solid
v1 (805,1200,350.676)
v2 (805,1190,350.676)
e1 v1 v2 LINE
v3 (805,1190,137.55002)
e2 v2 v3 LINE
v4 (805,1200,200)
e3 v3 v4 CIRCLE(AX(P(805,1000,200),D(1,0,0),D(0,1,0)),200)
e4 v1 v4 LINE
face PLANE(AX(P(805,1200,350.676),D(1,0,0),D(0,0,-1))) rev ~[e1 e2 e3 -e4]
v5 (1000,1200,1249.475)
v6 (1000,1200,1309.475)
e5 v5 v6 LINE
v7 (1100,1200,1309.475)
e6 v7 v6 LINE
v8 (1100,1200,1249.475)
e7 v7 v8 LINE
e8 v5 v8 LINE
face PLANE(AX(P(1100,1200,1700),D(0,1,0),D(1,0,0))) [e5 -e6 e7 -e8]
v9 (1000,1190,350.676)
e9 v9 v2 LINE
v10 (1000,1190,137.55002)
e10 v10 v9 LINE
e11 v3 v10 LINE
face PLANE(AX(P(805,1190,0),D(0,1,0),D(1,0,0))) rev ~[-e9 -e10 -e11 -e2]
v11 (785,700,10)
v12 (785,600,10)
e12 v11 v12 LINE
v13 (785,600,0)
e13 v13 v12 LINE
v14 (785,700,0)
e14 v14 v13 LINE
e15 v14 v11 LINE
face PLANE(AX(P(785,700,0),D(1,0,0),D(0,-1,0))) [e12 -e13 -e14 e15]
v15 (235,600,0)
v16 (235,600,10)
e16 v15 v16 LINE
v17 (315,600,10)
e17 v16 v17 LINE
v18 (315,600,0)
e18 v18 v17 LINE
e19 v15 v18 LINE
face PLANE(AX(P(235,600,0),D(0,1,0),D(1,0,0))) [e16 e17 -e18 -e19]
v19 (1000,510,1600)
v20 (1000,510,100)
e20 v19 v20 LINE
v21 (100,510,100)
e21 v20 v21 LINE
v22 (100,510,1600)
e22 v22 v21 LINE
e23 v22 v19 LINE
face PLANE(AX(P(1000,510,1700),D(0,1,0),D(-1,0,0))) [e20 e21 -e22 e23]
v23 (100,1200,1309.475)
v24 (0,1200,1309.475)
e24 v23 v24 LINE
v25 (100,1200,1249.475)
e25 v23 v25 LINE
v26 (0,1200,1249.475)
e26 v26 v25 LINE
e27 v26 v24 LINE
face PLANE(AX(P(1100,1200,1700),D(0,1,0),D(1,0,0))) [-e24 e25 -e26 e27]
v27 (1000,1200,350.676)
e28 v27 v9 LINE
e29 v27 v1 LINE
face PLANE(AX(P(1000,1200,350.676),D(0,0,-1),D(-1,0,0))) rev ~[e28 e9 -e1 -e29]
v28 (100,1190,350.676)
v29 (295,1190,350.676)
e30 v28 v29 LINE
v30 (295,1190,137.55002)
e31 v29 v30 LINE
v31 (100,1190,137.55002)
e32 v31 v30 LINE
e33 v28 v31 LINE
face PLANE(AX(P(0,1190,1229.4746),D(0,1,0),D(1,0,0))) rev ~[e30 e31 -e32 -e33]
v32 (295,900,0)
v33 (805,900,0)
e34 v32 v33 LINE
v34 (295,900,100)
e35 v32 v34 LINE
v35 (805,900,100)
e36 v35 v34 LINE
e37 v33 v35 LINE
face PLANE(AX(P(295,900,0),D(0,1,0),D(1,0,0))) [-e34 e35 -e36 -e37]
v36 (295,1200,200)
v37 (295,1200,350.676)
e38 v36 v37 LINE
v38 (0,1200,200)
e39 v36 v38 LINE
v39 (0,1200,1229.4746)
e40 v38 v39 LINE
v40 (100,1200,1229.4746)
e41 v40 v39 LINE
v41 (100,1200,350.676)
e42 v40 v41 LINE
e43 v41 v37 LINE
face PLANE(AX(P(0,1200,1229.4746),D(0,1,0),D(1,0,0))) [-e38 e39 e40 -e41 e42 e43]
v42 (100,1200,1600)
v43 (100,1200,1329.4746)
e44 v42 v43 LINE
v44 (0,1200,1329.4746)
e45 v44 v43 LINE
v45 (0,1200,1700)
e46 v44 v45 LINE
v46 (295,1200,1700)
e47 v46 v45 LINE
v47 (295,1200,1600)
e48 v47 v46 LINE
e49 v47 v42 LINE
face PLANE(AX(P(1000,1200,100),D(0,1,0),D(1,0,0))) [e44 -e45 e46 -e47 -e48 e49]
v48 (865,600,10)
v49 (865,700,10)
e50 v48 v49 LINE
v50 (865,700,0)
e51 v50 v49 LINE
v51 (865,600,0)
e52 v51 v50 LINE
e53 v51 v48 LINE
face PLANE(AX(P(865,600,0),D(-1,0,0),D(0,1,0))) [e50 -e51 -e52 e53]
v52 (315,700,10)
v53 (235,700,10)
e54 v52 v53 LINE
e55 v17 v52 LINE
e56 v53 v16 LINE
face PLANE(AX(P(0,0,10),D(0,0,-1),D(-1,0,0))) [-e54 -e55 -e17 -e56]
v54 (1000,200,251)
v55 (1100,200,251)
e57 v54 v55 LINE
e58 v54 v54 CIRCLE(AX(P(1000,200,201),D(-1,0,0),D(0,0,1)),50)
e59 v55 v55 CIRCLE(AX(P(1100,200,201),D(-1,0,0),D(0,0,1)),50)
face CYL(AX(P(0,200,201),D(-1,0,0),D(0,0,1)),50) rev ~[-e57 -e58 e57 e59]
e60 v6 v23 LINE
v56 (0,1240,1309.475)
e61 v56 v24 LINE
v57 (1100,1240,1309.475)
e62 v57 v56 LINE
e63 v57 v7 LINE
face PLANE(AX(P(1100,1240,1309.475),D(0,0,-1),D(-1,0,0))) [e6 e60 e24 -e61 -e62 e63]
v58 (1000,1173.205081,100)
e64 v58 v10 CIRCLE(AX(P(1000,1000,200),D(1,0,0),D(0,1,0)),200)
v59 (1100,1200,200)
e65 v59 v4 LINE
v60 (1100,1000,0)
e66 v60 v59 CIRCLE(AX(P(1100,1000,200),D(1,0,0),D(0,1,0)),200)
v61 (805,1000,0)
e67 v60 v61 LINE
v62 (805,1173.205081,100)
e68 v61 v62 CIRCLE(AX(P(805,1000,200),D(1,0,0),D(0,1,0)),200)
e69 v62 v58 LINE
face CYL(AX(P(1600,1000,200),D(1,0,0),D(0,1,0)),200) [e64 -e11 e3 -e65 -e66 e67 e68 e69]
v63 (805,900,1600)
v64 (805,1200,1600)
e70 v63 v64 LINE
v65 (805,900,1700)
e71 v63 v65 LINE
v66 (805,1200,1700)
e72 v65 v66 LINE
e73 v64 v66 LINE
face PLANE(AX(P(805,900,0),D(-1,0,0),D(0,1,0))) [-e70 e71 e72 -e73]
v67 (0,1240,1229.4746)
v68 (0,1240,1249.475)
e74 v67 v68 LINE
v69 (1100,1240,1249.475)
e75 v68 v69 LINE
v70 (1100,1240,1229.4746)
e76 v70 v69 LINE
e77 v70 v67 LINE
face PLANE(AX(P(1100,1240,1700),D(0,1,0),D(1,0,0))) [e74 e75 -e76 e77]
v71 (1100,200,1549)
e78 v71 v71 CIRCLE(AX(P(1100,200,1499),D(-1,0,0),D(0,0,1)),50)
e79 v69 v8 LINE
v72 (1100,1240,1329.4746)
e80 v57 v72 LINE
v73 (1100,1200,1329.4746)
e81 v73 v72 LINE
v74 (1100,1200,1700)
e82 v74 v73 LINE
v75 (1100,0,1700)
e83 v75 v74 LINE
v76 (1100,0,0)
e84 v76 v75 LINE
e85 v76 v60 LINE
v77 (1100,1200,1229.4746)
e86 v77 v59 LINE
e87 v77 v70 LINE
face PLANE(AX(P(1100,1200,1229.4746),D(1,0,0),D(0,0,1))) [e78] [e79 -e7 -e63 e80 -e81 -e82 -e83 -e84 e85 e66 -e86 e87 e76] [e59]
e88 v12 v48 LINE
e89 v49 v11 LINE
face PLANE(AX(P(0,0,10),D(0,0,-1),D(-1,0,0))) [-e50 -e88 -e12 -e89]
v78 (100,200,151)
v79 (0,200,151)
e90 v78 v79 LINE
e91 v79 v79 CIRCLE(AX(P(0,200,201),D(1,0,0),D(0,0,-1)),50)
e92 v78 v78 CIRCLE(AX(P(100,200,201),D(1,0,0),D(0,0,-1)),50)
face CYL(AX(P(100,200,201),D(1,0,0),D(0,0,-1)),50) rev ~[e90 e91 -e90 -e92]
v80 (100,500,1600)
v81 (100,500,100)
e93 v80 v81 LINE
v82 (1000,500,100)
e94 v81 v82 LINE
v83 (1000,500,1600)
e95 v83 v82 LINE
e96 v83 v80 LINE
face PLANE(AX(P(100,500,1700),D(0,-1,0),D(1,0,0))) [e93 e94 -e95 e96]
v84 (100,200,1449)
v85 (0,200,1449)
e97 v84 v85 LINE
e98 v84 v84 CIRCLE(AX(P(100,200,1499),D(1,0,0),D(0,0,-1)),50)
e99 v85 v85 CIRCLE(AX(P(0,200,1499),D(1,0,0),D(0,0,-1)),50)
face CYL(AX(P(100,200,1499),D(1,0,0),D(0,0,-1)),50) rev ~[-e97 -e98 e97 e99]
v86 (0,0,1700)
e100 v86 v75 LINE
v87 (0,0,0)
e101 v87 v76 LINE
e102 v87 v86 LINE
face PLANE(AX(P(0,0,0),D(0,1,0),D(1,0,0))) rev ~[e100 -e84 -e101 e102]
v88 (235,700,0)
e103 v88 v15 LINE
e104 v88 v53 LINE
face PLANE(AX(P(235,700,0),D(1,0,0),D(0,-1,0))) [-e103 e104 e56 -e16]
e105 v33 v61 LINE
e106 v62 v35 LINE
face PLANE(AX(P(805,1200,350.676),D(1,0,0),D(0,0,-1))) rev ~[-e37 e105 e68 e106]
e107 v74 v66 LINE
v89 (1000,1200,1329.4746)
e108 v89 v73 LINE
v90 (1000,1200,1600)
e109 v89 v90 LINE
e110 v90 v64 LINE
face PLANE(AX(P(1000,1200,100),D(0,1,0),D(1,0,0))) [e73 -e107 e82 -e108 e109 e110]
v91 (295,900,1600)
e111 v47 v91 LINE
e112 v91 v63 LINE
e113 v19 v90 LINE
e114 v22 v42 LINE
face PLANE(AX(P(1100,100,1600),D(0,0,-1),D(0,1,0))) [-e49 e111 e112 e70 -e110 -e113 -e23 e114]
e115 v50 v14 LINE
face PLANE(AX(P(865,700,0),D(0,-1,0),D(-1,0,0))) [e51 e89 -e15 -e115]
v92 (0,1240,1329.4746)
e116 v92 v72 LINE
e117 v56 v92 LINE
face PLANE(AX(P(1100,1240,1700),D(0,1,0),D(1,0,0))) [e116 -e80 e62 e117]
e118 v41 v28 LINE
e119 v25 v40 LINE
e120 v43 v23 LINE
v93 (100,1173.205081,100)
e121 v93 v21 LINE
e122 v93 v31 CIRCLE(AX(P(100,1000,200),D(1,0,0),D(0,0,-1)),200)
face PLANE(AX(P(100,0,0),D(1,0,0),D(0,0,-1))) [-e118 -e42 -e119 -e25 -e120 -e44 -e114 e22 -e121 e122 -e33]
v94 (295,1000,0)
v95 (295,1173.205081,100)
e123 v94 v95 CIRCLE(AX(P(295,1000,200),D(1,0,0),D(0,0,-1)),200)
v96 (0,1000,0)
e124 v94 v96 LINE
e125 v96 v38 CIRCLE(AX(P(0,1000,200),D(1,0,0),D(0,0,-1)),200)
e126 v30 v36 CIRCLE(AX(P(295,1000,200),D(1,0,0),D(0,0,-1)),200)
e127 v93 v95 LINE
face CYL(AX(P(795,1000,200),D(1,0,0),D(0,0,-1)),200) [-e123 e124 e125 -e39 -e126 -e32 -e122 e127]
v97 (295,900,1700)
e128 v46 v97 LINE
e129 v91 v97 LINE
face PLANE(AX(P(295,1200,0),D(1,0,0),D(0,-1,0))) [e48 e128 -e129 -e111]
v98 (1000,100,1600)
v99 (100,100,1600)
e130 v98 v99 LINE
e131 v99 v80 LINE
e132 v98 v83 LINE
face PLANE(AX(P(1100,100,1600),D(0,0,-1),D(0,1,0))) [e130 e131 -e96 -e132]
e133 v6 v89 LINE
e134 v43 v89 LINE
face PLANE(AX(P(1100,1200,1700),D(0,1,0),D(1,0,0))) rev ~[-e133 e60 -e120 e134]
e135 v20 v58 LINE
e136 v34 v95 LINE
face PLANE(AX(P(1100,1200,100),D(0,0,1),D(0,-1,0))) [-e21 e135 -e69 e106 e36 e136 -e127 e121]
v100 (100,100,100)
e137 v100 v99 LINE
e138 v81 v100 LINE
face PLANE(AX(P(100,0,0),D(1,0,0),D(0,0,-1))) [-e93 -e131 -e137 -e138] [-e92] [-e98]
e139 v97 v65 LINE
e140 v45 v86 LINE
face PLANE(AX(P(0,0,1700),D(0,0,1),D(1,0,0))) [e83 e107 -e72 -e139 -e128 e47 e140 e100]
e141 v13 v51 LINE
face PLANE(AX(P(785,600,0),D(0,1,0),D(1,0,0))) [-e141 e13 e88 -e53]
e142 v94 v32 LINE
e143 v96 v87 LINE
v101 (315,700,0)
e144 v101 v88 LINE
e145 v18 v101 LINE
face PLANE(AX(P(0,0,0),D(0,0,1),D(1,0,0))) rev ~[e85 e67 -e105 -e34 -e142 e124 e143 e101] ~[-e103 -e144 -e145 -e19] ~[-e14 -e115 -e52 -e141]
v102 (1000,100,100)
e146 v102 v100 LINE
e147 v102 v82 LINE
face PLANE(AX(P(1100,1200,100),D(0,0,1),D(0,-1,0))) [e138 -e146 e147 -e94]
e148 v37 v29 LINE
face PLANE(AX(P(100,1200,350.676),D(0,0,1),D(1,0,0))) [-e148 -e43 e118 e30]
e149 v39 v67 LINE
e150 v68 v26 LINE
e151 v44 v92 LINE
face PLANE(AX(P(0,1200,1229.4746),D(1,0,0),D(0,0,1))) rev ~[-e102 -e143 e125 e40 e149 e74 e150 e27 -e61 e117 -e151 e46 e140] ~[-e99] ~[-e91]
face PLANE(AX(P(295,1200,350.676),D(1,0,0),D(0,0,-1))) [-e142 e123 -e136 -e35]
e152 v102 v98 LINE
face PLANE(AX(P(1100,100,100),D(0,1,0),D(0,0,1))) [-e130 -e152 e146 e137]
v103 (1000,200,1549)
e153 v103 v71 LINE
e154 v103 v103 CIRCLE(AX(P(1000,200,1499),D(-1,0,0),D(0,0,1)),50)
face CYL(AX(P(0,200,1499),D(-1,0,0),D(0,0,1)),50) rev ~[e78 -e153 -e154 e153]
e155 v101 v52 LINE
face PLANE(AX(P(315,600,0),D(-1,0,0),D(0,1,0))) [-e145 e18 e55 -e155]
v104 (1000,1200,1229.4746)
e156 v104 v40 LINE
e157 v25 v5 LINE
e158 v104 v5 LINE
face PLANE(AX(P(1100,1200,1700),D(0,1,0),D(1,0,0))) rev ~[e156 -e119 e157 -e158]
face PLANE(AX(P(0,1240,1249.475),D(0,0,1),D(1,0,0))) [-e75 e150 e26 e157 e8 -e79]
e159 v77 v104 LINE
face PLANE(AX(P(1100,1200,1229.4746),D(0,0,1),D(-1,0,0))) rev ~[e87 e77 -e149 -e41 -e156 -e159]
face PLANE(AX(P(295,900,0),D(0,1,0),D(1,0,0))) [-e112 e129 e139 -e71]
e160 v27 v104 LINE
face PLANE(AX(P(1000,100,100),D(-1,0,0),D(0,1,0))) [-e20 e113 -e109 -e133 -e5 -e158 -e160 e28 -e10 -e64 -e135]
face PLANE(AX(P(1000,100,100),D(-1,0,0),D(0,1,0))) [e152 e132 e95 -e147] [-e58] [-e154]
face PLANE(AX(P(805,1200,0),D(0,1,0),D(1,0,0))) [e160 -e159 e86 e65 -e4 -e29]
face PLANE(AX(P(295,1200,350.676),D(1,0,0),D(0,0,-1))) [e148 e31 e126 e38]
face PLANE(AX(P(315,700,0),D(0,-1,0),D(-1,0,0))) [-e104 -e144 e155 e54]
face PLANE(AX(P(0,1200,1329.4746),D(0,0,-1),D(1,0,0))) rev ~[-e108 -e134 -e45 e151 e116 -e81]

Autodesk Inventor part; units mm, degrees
ref_plane "YZ Plane" through (0, 0, 0) normal (1, 0, 0) x (0, 1, 0)
ref_plane "XZ Plane" through (0, 0, 0) normal (0, 1, 0) x (-1, 0, 0)
ref_plane "XY Plane" through (0, 0, 0) normal (0, 0, 1) x (1, 0, 0)
sketch "Sketch10" plane through (0, 0, 0) normal (0, 1, 0) x (-1, 0, 0)
  point P0 (0, 0)
sketch "Sketch11" plane through (0, 0, 0) normal (0, 0, 1) x (1, 0, 0)
  point P0 (0, 0)
sketch "Sketch12" plane through (0, 0, 0) normal (0, 0, 1) x (1, 0, 0)
  line L0 (0, 0) -> (1100, 0)
  line L1 (1100, 0) -> (1100, 1200)
  line L2 (1100, 1200) -> (0, 1200)
  line L3 (0, 1200) -> (0, 0)
  dimension "d20" = 1100
  dimension "d21" = 1200
extrude "Extrusion6" add sketch "Sketch12" along normal blind 1700
sketch "Sketch13" plane through (1100, 0, 0) normal (1, 0, 0) x (0, 0, -1)
  line L0 (-100, 100) -> (-1600, 100)
  line L1 (-1600, 100) -> (-1600, 1200)
  line L2 (-1600, 1200) -> (-100, 1200)
  line L3 (-100, 1200) -> (-100, 100)
  point P0 (0, 0)
  dimension "d24" = 1500
extrude "Extrusion7" cut sketch "Sketch13" against normal blind 1000
sketch "Sketch16" plane through (100, 0, 0) normal (1, 0, 0) x (0, 0, -1)
  circle A0 centre (-1499, 200) radius 50
  circle A1 centre (-201, 200) radius 50
  point P0 (0, 0)
  dimension "d34" = 100
  dimension "d35" = 100
extrude "Extrusion10" cut sketch "Sketch16" along normal blind 1200 and the other way blind 200
sketch "Sketch18" plane through (1100, 100, 100) normal (0, 0, 1) x (1, 0, 0)
  line L0 (0, 0) -> (-1000, 0) projected
  line L1 (-1000, 1100) -> (0, 1100) projected
  line L2 (0, 0) -> (-100, 0)
  line L3 (-100, 0) -> (-100, 1100)
  line L4 (-100, 1100) -> (0, 1100)
  line L5 (0, 1100) -> (0, 0)
  point P0 (-1100, -100)
  dimension "d43" = 100
extrude "Extrusion12" add sketch "Sketch18" along normal blind 1500
sketch "Sketch19" plane through (0, 0, 1700) normal (0, 0, 1) x (1, 0, 0)
  line L0 (100, 500) -> (1000, 500)
  line L1 (1000, 500) -> (1000, 510)
  line L2 (1000, 510) -> (100, 510)
  line L3 (100, 510) -> (100, 500)
  point P0 (0, 0)
  dimension "d46" = 900
  dimension "d47" = 10
extrude "Extrusion13" add sketch "Sketch19" against normal blind 1700
sketch "Sketch20" plane through (0, 0, 0) normal (0, 0, -1) x (-1, 0, 0)
  line L0 (-805, 1200) -> (-295, 1200)
  line L1 (-295, 1200) -> (-295, 900)
  line L2 (-295, 900) -> (-805, 900)
  line L3 (-805, 900) -> (-805, 1200)
  point P0 (0, 0)
  dimension "d58" = 510
  dimension "d59" = 300
extrude "Extrusion14" cut sketch "Sketch20" against normal blind 1700
sketch "Sketch21" plane through (1100, 1200, 1700) normal (0, 1, 0) x (1, 0, 0)
  line L0 (0, 1700) -> (0, 0) projected
  line L1 (-1100, 1700) -> (-1100, 0) projected
  line L2 (0, 470.5254) -> (-1100, 470.5254)
  line L3 (-1100, 470.5254) -> (-1100, 370.5254)
  line L4 (-1100, 370.5254) -> (0, 370.5254)
  line L5 (0, 370.5254) -> (0, 470.5254)
  dimension "d60" = 100
extrude "Extrusion15" add sketch "Sketch21" along normal blind 40
sketch "Sketch22" plane through (1100, 1240, 1700) normal (0, 1, 0) x (1, 0, 0)
  line L0 (-1100, 470.5254) -> (-1100, 370.5254) projected
  line L1 (0, 370.5254) -> (0, 470.5254) projected
  line L2 (-1100, 450.525) -> (0, 450.525)
  line L3 (0, 450.525) -> (0, 390.525)
  line L4 (0, 390.525) -> (-1100, 390.525)
  line L5 (-1100, 390.525) -> (-1100, 450.525)
  point P0 (-1100, 1700)
  dimension "d63" = 60
extrude "Extrusion16" cut sketch "Sketch22" against normal blind 40
sketch "Sketch23" plane through (1100, 1240, 1700) normal (0, 1, 0) x (1, 0, 0)
  point P0 (-1100, 1700)
sketch "Sketch25" plane through (1100, 0, 0) normal (1, 0, 0) x (0, 0, -1)
  point P0 (0, 0)
sketch "Sketch27" plane through (0, 0, 0) normal (0, 0, -1) x (-1, 0, 0)
  line L0 (-865, 700) -> (-785, 700)
  line L1 (-785, 700) -> (-785, 600)
  line L2 (-785, 600) -> (-865, 600)
  line L3 (-865, 600) -> (-865, 700)
  line L4 (0, 0) -> (-1100, 0) projected
  line L5 (-1100, 0) -> (-1100, 1200) projected
  line L6 (-805, 900) -> (-805, 1200) projected
  line L7 (-315, 700) -> (-235, 700)
  line L8 (-235, 700) -> (-235, 600)
  line L9 (-235, 600) -> (-315, 600)
  line L10 (-315, 600) -> (-315, 700)
  line L11 (-295, 1200) -> (-295, 900) projected
  dimension "d77" = 100
  dimension "d78" = 80
  dimension "d79" = 600
  dimension "d81" = 20
  dimension "d82" = 100
  dimension "d83" = 80
  dimension "d84" = 600
  dimension "d85" = 20
extrude "Extrusion17" cut sketch "Sketch27" against normal blind 10
sketch "Sketch28" plane through (0, 1200, 1229.4746) normal (0, 1, 0) x (1, 0, 0)
  line L0 (100, 0) -> (100, 1129.4746) projected
  line L1 (295, 1129.4746) -> (100, 1129.4746)
  line L2 (100, 1129.4746) -> (100, 878.7986)
  line L3 (100, 878.7986) -> (295, 878.7986)
  line L4 (295, 878.7986) -> (295, 1129.4746)
  point P0 (0, 1229.4746)
  point P1 (100, 1029.4746)
  dimension "d90" = 250.676
extrude "Extrusion18" add sketch "Sketch28" against normal blind 10
sketch "Sketch29" plane through (805, 1200, 0) normal (0, 1, 0) x (1, 0, 0)
  line L0 (0, 0) -> (0, -100) projected
  line L1 (195, -100) -> (195, -1229.4746) projected
  line L2 (0, -100) -> (195, -100)
  line L3 (195, -100) -> (195, -350.676)
  line L4 (195, -350.676) -> (0, -350.676)
  line L5 (0, -350.676) -> (0, -100)
  point P0 (-805, 0)
  dimension "d93" = 250.676
extrude "Extrusion19" add sketch "Sketch29" against normal blind 10
sketch "Sketch30" plane through (0, 1200, 0) normal (0, 1, 0) x (1, 0, 0)
  point P0 (0, 0)
fillet "Fillet3" radius 200 2 edges at (952.5, 1200, 0) (147.5, 1200, 0)
sketch "Sketch31" plane through (0, 0, 1700) normal (-1, 0, 0) x (0, 0, 1)
  circle A0 centre (-1499, 200) radius 50 projected
  circle A1 centre (-1499, 200) radius 50
  point P0 (-1700, 0)
extrude "Extrusion20" cut sketch "Sketch31" against normal blind 10000
sketch "Sketch32" plane through (0, 0, 1700) normal (-1, 0, 0) x (0, 0, 1)
  circle A0 centre (-201, 200) radius 50 projected
  circle A1 centre (-201, 200) radius 50
  point P0 (-1700, 0)
extrude "Extrusion21" cut sketch "Sketch32" against normal blind 10000
properties part number "Design" material "Copper"
